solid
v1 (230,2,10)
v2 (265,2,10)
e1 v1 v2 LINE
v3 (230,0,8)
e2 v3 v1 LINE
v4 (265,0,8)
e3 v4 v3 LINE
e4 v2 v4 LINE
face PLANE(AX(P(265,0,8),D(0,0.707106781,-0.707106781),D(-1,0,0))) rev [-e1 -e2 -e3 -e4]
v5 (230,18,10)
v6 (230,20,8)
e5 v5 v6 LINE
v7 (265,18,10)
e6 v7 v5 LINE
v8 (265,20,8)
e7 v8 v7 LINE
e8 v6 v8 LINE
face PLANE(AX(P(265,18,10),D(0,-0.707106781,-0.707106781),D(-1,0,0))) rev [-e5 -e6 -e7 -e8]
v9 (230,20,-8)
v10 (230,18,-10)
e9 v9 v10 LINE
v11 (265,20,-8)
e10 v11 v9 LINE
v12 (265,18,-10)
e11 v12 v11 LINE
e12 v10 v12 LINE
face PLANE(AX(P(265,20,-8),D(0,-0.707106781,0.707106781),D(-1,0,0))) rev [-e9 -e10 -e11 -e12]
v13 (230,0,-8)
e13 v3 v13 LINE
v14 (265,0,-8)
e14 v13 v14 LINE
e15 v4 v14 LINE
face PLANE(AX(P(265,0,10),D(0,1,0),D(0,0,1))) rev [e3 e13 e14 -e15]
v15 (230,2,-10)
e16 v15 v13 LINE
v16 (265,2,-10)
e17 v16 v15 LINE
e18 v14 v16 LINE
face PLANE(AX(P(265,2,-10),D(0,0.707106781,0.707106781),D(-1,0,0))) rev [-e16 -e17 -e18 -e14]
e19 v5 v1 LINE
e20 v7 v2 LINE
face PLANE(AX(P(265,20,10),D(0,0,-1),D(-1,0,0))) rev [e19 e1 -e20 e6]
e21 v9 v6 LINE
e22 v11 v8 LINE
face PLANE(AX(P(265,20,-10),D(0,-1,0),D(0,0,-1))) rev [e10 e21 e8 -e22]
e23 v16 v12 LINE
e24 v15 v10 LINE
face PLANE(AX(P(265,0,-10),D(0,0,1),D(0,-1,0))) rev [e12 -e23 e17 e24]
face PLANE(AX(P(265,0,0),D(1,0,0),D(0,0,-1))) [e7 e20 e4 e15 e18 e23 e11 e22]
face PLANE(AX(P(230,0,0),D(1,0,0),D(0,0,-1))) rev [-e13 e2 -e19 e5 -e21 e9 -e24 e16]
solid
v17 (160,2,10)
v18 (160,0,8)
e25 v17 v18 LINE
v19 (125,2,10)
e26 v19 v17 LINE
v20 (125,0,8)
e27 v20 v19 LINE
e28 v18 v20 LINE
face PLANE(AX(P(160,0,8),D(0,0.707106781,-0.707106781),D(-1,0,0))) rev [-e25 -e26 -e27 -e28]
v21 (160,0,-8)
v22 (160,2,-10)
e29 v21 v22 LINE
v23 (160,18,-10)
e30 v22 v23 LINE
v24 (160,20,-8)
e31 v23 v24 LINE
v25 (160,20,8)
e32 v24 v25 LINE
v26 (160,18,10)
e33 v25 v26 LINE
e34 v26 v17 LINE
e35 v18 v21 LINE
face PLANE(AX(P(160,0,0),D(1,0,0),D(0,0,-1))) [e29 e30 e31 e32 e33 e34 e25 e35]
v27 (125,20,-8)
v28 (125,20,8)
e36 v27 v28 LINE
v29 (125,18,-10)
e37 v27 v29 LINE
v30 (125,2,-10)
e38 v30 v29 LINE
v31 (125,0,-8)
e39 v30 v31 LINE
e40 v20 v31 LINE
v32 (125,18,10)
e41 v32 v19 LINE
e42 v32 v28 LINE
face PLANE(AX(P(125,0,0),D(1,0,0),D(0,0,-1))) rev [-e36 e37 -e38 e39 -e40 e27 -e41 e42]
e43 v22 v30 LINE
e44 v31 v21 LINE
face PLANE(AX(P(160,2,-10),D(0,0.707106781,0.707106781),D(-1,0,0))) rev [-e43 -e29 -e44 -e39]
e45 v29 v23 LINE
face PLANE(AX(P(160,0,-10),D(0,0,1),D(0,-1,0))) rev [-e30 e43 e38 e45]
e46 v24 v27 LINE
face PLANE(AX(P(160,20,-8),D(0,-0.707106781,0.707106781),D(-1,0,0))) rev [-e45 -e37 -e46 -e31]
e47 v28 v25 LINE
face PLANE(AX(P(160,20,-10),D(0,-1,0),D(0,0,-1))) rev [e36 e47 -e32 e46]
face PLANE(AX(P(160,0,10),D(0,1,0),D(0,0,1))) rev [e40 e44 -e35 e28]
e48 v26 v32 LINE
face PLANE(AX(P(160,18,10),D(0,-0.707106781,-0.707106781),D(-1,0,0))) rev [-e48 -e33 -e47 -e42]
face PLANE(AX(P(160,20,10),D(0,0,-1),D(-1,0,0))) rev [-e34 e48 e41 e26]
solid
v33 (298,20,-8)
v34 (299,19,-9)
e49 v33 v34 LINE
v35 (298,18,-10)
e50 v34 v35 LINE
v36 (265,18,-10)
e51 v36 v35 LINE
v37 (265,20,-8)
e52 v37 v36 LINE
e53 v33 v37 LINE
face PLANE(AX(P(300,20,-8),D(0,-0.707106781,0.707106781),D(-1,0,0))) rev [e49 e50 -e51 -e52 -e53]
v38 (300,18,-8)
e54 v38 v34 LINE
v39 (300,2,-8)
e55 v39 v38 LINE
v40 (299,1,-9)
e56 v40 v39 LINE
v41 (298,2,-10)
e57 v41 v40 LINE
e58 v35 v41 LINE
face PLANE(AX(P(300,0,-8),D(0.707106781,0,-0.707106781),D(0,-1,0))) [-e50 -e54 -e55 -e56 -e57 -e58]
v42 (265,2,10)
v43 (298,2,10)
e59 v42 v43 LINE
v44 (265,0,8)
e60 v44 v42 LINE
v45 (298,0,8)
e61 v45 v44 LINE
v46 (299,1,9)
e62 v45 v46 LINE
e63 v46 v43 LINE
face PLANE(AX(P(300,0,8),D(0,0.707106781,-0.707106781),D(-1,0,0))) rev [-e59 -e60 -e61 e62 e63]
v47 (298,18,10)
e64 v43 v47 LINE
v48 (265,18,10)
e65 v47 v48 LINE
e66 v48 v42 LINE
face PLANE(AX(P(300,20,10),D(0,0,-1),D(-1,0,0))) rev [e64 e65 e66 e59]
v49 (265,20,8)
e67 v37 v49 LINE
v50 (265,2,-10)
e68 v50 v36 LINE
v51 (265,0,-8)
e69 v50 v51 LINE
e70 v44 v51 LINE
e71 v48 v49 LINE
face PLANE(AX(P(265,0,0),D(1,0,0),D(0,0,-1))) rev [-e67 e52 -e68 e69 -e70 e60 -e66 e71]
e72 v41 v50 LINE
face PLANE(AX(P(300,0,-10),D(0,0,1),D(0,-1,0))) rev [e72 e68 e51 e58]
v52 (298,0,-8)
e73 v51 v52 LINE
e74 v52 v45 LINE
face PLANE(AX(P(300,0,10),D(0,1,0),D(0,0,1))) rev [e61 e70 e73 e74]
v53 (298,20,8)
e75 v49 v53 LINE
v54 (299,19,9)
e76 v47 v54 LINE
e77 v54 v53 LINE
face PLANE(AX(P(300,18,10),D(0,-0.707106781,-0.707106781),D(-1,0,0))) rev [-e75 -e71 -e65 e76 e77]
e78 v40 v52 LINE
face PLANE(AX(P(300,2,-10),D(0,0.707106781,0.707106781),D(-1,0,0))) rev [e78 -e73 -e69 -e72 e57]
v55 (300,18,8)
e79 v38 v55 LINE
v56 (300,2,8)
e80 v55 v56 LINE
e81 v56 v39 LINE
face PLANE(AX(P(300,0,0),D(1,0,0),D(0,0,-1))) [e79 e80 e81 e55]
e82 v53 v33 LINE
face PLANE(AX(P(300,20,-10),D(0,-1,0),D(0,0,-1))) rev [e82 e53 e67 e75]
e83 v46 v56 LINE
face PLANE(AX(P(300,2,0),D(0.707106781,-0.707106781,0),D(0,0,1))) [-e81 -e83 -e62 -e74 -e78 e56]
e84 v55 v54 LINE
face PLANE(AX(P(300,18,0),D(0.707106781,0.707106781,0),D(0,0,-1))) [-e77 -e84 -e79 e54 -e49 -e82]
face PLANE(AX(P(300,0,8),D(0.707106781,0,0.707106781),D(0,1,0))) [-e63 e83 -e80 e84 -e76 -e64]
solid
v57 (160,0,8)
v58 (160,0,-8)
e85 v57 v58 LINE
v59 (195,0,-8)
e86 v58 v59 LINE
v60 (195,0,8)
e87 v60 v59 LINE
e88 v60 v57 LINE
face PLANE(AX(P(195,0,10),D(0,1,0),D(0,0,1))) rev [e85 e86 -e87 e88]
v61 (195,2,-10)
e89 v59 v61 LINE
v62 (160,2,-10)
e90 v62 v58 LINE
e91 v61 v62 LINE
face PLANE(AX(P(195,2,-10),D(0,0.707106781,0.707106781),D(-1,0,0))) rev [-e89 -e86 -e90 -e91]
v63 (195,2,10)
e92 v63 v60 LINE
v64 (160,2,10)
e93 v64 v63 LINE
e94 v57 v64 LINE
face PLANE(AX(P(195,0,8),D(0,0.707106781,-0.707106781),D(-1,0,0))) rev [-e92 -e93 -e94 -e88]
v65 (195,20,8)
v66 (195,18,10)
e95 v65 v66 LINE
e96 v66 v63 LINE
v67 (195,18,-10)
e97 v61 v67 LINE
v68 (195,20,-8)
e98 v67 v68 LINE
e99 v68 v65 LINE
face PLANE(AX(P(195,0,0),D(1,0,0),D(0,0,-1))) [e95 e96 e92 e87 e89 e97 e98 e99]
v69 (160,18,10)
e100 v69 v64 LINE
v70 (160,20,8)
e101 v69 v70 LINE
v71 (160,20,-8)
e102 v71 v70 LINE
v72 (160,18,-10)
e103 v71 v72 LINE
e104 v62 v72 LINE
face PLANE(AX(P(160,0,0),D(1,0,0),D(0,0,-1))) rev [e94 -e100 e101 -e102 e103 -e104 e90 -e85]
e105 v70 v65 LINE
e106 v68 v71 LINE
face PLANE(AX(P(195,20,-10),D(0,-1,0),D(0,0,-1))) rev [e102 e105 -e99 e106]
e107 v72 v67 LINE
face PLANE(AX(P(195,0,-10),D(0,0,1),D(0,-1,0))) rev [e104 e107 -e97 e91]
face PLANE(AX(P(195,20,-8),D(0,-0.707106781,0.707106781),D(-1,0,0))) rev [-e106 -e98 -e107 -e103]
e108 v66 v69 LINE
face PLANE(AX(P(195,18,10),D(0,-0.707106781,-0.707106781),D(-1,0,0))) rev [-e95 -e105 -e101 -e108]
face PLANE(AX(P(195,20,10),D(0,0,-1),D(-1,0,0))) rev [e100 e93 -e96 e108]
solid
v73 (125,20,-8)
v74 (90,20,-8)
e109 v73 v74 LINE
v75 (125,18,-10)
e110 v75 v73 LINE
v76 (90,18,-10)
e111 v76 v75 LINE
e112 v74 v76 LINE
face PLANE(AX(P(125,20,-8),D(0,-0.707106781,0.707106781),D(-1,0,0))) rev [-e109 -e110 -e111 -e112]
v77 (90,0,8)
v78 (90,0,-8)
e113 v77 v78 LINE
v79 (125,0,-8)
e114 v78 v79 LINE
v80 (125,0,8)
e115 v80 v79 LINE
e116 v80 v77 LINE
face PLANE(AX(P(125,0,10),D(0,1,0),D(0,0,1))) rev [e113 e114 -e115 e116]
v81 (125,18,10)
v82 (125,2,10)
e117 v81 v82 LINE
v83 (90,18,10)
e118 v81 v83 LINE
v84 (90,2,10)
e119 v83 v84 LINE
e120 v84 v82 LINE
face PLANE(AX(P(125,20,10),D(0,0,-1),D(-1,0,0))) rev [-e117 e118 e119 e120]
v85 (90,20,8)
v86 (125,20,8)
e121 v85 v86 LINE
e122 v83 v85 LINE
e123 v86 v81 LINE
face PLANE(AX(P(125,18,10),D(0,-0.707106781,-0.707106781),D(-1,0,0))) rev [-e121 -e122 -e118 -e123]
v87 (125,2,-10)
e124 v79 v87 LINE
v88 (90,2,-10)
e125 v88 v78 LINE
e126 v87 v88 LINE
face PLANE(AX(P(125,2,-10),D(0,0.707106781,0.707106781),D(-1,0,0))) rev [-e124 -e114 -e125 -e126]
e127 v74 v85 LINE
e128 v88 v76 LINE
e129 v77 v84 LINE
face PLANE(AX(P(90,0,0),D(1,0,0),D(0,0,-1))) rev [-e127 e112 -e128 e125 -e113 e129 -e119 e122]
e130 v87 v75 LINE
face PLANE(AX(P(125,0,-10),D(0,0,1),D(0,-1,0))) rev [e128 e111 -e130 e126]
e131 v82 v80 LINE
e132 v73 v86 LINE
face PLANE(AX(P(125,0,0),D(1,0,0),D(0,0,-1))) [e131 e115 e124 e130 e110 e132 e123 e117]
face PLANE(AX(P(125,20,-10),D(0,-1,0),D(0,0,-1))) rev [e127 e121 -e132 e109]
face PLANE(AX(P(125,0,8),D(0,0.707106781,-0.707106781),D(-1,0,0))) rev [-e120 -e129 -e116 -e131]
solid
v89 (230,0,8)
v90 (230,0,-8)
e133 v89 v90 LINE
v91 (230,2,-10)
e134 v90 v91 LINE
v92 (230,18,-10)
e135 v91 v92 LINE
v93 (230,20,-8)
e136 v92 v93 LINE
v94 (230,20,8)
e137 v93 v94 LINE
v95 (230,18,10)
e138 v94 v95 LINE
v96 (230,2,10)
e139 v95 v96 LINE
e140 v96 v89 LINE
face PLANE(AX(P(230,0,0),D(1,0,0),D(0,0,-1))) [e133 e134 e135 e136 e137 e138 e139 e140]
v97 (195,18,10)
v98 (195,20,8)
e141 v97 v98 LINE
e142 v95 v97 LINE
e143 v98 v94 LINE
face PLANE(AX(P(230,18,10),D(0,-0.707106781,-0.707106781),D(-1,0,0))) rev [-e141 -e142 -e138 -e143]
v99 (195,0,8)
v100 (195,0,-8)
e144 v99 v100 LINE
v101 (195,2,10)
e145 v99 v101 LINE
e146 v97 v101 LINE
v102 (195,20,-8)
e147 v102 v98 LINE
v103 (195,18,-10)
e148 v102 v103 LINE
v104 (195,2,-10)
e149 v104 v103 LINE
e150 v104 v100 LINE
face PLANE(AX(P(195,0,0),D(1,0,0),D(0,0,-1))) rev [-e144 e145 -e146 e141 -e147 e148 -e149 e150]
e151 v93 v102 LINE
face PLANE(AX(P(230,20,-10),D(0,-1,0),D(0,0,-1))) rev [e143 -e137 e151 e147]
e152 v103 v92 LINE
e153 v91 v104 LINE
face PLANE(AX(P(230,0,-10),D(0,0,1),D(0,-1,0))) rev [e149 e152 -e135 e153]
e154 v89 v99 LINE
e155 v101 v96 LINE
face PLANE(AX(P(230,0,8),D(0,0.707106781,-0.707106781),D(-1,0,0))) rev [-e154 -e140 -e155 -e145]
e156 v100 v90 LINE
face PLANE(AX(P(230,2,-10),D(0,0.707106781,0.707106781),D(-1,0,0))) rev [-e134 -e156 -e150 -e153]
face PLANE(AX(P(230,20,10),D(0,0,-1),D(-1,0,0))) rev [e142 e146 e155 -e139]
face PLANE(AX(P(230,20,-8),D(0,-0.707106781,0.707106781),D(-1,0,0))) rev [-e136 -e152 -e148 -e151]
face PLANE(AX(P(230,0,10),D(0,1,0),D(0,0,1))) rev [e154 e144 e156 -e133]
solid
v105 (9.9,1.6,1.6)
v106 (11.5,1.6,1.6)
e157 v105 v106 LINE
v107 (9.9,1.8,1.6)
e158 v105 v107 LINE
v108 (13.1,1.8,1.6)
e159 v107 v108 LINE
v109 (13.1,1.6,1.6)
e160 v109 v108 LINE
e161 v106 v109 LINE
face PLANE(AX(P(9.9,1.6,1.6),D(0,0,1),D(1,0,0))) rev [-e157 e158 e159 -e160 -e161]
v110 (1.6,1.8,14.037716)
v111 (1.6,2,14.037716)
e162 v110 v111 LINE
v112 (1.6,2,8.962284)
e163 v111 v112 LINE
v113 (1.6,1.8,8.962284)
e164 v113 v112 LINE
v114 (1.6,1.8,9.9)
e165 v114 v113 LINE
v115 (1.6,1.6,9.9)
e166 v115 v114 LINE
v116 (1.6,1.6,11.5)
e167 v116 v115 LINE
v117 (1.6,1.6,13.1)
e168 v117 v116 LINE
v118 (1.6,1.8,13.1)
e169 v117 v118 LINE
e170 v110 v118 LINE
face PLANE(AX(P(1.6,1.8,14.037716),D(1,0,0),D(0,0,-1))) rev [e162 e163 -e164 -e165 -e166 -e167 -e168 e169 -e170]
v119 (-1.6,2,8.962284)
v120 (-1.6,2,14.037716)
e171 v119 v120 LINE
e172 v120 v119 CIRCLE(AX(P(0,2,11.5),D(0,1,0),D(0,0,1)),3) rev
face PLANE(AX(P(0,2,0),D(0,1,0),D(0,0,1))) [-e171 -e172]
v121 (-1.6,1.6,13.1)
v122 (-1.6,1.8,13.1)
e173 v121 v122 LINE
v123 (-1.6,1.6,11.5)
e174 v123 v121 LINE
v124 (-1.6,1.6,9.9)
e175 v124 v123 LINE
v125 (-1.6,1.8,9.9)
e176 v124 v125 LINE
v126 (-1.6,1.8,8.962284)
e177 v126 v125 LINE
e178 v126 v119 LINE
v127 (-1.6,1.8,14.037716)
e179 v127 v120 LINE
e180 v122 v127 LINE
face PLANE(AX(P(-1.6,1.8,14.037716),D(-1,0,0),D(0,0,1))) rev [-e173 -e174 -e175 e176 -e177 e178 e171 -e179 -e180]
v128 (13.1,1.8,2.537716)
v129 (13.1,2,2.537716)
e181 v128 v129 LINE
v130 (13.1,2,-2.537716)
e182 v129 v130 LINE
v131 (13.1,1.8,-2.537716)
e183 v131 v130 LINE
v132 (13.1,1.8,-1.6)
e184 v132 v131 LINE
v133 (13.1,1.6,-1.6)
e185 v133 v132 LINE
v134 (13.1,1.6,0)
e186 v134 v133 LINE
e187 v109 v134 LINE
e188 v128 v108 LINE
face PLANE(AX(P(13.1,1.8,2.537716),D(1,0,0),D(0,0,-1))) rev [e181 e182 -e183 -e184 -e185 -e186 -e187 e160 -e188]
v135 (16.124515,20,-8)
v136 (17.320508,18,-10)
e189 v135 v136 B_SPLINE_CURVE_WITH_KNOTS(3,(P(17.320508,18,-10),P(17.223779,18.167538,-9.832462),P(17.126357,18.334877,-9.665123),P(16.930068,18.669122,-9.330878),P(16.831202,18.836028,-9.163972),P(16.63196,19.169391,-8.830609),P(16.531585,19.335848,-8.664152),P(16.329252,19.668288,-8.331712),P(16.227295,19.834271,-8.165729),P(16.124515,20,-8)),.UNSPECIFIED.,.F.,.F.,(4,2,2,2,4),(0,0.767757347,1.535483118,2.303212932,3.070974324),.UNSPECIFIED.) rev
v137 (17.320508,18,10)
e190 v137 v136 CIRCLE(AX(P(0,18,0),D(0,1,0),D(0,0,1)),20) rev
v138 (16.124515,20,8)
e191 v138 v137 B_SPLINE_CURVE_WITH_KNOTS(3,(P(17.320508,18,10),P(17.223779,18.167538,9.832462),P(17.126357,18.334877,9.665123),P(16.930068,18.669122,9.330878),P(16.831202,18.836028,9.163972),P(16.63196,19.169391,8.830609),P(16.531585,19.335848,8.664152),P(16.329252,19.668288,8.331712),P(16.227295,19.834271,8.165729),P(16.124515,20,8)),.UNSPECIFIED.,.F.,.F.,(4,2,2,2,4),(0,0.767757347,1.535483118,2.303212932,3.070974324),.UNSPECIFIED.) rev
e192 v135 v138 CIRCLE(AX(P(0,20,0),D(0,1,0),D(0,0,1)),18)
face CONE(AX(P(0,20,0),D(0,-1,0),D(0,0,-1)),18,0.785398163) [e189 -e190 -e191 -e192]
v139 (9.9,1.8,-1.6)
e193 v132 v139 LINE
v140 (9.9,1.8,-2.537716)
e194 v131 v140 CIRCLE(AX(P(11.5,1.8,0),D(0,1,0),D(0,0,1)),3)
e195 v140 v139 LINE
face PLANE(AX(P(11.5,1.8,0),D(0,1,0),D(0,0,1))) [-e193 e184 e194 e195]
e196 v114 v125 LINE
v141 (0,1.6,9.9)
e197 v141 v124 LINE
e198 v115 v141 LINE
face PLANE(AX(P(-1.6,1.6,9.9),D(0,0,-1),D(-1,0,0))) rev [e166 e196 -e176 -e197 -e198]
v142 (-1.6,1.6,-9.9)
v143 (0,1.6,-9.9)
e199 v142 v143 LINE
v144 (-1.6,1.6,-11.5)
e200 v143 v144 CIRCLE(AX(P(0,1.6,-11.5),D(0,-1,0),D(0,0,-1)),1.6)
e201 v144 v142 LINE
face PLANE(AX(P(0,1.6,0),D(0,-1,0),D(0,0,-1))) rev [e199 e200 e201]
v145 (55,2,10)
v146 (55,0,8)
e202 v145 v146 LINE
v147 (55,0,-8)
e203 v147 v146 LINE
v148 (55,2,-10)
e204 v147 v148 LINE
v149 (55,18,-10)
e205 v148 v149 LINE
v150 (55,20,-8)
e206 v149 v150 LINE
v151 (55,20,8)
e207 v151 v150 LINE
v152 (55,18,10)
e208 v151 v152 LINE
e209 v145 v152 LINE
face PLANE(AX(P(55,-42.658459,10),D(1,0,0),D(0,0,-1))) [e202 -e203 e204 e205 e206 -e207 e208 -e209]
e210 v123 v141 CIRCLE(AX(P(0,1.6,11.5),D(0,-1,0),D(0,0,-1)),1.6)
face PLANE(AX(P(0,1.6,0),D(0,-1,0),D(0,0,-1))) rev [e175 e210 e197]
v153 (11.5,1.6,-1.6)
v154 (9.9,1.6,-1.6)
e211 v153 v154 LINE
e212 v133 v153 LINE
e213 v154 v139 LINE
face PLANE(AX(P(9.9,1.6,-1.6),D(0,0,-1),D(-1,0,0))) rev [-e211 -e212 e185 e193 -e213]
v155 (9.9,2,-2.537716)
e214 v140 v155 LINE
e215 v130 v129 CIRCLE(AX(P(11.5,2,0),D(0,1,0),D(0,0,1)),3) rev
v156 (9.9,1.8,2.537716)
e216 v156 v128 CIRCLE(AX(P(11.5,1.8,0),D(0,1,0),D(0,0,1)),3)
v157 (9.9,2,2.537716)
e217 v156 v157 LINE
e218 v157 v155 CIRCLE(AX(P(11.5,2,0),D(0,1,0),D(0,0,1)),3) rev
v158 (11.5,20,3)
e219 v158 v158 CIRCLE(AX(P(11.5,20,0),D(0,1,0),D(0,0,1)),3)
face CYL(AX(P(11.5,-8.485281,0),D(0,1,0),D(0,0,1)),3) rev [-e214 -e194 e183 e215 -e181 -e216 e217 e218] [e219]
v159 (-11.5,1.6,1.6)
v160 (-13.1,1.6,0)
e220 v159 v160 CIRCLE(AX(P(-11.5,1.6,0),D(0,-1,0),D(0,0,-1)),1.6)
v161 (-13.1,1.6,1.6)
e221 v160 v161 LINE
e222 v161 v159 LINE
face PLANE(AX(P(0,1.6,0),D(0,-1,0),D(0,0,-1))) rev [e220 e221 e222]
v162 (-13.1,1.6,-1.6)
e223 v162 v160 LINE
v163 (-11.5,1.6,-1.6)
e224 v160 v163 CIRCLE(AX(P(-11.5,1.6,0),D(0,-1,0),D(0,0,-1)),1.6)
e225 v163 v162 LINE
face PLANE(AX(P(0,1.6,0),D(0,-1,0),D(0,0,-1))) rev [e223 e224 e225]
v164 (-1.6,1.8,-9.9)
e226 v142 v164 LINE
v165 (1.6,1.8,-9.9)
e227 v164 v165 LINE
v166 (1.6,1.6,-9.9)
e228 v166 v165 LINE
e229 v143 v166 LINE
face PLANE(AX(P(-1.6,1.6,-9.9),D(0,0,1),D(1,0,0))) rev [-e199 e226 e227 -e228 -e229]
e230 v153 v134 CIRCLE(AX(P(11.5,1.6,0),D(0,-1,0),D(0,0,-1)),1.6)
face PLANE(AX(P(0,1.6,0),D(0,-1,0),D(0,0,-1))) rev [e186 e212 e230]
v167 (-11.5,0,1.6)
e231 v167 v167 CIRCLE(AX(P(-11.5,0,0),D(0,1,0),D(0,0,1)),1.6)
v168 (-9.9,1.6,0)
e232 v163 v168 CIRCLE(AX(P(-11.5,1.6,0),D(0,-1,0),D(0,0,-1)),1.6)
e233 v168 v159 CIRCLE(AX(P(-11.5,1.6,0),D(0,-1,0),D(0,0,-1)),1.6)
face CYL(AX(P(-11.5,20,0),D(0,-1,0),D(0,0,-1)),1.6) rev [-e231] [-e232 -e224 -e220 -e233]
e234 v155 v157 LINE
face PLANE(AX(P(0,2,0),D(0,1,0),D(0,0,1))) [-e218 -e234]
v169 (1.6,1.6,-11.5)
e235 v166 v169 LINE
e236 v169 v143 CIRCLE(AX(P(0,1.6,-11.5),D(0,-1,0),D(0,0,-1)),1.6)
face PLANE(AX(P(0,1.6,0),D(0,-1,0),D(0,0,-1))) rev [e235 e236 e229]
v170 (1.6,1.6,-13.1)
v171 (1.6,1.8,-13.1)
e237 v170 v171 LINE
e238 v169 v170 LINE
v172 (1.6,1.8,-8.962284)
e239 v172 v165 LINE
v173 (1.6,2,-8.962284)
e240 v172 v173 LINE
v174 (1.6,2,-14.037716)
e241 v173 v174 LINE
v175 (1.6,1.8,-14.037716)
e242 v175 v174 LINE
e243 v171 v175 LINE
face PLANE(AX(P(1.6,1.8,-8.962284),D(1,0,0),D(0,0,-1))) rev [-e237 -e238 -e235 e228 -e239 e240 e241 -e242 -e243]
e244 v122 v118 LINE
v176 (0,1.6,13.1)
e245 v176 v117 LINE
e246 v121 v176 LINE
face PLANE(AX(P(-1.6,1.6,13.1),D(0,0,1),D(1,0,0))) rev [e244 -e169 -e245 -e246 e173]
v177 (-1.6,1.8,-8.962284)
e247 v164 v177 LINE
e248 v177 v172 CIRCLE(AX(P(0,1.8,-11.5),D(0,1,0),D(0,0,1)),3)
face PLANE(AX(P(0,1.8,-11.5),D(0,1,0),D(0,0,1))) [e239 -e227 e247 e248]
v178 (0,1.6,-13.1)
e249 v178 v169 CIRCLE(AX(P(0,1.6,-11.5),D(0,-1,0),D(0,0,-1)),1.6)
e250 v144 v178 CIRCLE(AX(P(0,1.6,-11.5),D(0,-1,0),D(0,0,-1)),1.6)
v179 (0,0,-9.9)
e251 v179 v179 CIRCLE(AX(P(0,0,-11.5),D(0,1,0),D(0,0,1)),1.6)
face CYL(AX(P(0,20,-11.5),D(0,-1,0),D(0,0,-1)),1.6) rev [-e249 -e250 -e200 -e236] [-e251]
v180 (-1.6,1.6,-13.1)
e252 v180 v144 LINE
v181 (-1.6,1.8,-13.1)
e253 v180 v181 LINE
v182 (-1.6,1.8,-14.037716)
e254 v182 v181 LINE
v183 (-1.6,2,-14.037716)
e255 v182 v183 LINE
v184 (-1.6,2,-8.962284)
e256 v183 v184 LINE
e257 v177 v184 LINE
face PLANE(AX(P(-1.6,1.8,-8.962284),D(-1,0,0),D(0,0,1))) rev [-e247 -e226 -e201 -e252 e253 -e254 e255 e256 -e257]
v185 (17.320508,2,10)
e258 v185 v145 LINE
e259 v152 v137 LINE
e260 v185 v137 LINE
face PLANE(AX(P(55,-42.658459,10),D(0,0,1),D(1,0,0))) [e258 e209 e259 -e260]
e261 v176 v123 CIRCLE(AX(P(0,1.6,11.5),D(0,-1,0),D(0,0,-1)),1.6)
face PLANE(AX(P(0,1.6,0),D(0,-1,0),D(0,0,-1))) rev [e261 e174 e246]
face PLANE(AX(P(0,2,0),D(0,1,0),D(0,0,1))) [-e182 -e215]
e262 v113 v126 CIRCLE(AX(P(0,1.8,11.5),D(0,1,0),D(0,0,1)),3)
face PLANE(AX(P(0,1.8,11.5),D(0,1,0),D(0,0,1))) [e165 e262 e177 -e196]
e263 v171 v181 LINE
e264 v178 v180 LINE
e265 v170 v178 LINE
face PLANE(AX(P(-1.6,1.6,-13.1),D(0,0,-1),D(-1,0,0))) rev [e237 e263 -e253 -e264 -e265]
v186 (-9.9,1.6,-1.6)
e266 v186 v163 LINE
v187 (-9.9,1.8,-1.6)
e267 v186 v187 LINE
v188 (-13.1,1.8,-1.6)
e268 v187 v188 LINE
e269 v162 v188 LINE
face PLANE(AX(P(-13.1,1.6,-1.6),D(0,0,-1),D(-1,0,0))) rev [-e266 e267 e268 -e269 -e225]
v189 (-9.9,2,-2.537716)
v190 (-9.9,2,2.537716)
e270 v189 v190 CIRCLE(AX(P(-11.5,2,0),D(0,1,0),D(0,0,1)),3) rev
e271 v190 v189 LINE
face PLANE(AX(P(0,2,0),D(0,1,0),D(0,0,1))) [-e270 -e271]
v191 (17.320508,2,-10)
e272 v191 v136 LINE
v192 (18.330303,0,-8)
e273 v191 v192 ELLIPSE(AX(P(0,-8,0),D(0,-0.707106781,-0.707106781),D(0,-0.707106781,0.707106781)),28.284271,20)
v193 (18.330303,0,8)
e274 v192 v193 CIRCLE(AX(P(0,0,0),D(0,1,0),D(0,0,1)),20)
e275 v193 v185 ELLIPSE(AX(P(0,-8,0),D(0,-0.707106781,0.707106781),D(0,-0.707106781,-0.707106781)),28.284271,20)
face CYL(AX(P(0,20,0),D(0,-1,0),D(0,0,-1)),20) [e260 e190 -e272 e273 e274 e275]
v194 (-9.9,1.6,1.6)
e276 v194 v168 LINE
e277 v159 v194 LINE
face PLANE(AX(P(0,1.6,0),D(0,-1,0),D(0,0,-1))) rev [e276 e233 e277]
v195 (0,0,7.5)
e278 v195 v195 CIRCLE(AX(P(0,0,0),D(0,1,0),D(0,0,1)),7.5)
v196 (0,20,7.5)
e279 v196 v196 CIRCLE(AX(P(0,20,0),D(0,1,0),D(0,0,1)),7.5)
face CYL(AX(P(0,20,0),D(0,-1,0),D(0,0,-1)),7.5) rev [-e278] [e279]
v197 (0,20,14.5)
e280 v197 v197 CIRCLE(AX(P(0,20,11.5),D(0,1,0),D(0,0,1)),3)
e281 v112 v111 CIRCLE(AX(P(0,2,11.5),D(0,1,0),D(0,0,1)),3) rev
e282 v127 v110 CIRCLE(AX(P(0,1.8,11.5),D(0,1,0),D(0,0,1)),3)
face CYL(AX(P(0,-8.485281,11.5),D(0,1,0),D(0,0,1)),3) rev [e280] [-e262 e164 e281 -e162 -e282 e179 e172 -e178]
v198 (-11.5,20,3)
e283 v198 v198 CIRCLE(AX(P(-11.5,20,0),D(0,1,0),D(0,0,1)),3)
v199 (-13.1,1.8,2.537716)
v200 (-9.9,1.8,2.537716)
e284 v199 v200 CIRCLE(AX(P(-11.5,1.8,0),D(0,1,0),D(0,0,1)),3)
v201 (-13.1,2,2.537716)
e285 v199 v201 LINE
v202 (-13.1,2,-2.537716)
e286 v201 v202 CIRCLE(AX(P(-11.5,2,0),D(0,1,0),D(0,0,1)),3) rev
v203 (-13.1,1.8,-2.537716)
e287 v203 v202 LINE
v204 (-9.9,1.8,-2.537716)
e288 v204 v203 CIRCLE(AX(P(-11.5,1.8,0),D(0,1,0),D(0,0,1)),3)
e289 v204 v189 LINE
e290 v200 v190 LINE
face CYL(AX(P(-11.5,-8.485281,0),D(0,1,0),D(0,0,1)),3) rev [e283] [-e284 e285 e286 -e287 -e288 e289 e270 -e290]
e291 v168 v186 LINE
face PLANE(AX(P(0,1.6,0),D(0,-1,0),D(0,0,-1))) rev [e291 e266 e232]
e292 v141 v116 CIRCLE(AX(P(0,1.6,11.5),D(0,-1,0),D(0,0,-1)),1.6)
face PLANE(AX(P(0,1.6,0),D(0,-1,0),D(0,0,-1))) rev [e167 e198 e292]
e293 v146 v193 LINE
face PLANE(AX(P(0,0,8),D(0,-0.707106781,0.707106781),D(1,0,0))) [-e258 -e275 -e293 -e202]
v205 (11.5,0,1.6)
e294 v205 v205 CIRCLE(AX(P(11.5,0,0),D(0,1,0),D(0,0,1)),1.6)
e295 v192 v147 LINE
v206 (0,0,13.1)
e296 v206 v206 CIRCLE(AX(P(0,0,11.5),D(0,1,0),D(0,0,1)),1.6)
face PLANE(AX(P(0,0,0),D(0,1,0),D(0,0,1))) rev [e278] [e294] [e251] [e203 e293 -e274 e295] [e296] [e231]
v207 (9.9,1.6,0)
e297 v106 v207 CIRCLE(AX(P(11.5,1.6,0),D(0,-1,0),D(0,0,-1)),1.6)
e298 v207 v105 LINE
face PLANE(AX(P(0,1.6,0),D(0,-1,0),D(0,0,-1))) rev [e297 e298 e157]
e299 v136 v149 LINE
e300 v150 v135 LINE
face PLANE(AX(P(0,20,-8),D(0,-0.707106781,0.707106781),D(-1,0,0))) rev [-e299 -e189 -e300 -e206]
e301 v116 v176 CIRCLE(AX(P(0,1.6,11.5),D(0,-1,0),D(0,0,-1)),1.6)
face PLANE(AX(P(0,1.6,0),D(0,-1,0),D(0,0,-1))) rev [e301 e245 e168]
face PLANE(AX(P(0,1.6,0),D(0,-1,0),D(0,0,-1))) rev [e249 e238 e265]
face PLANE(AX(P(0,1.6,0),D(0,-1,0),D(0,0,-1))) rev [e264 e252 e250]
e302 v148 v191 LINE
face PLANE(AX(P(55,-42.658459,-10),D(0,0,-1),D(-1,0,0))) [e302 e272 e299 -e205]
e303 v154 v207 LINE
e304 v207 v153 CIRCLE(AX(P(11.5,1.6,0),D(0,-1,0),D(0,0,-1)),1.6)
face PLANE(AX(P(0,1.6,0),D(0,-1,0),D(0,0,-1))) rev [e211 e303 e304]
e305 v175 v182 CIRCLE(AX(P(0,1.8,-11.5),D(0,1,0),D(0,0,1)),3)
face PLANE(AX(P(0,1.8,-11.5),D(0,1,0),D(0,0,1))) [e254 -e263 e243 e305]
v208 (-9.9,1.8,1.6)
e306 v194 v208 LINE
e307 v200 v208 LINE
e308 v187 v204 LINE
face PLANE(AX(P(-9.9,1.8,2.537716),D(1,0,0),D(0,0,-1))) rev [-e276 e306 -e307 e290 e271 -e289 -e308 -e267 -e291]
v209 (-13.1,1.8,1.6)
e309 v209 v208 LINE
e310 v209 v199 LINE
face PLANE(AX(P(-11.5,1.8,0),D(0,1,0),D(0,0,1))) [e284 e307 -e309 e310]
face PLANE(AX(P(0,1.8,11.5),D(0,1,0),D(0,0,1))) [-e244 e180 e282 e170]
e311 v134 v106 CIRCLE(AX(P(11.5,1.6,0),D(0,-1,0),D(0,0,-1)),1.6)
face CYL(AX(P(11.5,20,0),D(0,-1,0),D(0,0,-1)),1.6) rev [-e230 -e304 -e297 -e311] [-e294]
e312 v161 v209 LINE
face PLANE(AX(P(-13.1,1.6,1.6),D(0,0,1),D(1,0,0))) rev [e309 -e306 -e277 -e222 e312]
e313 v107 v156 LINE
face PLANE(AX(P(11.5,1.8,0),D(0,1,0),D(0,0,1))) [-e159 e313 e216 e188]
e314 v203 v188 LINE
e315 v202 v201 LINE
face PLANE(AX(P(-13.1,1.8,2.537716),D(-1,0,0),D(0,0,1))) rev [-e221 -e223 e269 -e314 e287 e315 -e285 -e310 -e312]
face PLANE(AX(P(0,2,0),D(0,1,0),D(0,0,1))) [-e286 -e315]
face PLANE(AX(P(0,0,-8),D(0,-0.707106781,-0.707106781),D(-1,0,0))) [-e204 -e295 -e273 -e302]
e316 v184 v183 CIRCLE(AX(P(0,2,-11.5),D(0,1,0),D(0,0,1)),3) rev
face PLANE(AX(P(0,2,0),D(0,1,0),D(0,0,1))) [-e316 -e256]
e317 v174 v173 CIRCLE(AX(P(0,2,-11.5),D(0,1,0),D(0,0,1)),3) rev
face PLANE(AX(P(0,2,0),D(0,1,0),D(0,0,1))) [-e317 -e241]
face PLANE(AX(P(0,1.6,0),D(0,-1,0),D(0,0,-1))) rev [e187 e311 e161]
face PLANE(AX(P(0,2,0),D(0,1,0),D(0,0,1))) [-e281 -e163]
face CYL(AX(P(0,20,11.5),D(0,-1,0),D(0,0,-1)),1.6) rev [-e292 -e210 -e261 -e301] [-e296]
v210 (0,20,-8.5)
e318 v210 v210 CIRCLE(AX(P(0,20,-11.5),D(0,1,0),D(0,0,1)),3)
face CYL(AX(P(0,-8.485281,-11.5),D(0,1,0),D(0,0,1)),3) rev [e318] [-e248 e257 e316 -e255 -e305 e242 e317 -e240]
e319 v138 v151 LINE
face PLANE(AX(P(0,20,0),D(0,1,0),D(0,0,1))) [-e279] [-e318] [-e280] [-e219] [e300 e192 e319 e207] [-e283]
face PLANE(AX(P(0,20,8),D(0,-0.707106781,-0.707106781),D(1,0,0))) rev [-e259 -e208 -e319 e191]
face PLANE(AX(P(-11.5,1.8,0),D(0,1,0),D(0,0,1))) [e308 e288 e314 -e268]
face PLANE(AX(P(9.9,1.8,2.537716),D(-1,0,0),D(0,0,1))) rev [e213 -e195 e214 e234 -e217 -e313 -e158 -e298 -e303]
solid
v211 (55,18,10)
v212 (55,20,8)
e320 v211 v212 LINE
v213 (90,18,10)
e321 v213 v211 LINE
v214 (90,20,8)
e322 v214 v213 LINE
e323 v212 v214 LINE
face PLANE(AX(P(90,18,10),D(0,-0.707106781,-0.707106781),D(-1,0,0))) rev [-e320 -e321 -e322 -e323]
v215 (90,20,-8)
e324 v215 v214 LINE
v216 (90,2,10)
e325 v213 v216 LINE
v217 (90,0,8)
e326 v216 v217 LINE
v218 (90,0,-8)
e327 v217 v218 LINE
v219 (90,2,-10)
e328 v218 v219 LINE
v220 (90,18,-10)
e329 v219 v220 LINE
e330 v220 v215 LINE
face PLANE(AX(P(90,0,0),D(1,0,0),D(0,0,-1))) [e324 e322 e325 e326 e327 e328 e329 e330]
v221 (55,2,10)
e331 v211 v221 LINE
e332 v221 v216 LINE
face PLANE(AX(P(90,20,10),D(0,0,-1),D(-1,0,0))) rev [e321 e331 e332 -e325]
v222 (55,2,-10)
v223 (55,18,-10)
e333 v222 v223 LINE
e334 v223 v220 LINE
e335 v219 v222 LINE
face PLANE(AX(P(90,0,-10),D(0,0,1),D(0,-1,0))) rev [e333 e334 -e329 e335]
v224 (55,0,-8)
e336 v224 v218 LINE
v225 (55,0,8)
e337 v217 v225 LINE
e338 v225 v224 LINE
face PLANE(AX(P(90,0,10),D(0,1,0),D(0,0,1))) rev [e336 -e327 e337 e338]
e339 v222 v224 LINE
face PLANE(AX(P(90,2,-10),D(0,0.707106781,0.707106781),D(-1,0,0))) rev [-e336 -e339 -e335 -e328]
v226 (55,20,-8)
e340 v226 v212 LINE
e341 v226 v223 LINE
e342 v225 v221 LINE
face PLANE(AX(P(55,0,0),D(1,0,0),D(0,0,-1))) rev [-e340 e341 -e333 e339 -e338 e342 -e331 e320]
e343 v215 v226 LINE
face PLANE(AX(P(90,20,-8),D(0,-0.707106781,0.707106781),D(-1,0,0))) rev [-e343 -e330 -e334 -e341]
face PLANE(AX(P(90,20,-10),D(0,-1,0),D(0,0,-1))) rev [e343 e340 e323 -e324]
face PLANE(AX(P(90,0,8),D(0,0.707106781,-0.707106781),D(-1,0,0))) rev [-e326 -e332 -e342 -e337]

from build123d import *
from build123d.topology import SkipClean

# Parameters (mm, degrees)
SKETCH1_R           = 20
SKETCH1_R_2         = 7.5
SKETCH1_R_3         = 1.6
BOSS_EXTRUDE1_DEPTH = 20
SKETCH2_R           = 3
CUT_EXTRUDE2_DEPTH  = 18
BOSS_EXTRUDE2_START = -20
BOSS_EXTRUDE2_DEPTH = 20
SKETCH4_W           = 20
SKETCH4_H           = 20
BOSS_EXTRUDE3_DEPTH = 35
LPATTERN1_COUNT     = 7
LPATTERN1_PITCH     = 35
CHAMFER2_SIZE       = 2
CHAMFER3_SIZE       = 2
CHAMFER4_SIZE       = 2
CHAMFER5_SIZE       = 2
CHAMFER6_SIZE       = 2
CHAMFER7_SIZE       = 2
CHAMFER8_SIZE       = 2
CHAMFER9_SIZE       = 2
CHAMFER10_SIZE      = 2
CUT_EXTRUDE3_DEPTH  = 0.2
SKETCH6_W           = 3.2
SKETCH6_H           = 3.2
CUT_EXTRUDE4_DEPTH  = 0.2


with BuildPart() as part:
    # Sketch1 → Boss-Extrude1 (new body)
    with BuildSketch(Plane(origin=(0, 0, 0), x_dir=(1, 0, 0), z_dir=(0, 1, 0))):
        with Locations(Location((0, 0, 0), (0, 0, 270))):
            Circle(SKETCH1_R)
        with Locations(Location((0, 0, 0), (0, 0, 270))):
            Circle(SKETCH1_R_2, mode=Mode.SUBTRACT)
        with Locations(Location((0, 11.5, 0), (0, 0, 270))):
            Circle(SKETCH1_R_3, mode=Mode.SUBTRACT)
        with Locations(Location((11.5, 0, 0), (0, 0, 270))):
            Circle(SKETCH1_R_3, mode=Mode.SUBTRACT)
        with Locations(Location((0, -11.5, 0), (0, 0, 270))):
            Circle(SKETCH1_R_3, mode=Mode.SUBTRACT)
        with Locations(Location((-11.5, 0, 0), (0, 0, 270))):
            Circle(SKETCH1_R_3, mode=Mode.SUBTRACT)
    extrude(amount=BOSS_EXTRUDE1_DEPTH)

    # Sketch2 → Cut-Extrude2 (cut)
    with BuildSketch(Plane(origin=(0, 20, 0), x_dir=(1, 0, 0), z_dir=(0, 1, 0))):
        with Locations(Location((0, 11.5, 0), (0, 0, 270))):
            Circle(SKETCH2_R)
        with Locations(Location((11.5, 0, 0), (0, 0, 270))):
            Circle(SKETCH2_R)
        with Locations(Location((0, -11.5, 0), (0, 0, 270))):
            Circle(SKETCH2_R)
        with Locations(Location((-11.5, 0, 0), (0, 0, 270))):
            Circle(SKETCH2_R)
    extrude(amount=-CUT_EXTRUDE2_DEPTH, mode=Mode.SUBTRACT)

    # Sketch3 → Boss-Extrude2 (add)
    with BuildSketch(Plane(origin=(0, 20, 0), x_dir=(1, 0, 0), z_dir=(0, 1, 0)).offset(BOSS_EXTRUDE2_START)):
        with BuildLine():
            Line((55, -10), (55, 10))
            Line((55, 10), (17.320508076, 10))
            ThreePointArc((17.320508076, 10), (20, 0), (17.320508076, -10))
            Line((17.320508076, -10), (55, -10))
        make_face()
    extrude(amount=BOSS_EXTRUDE2_DEPTH)

    # Chamfer9
    chamfer9_edges = [part.edges().sort_by_distance(p)[0] for p in [
        (-20, 20, 0),
        (36.160254038, 20, -10),
        (36.160254038, 20, 10),
        (36.160254038, 0, -10),
        (36.160254038, 0, 10),
    ]]
    chamfer(chamfer9_edges, length=CHAMFER9_SIZE)

    # Sketch5 → Cut-Extrude3 (cut)
    with SkipClean():  # the faces are left unmerged after this step: merging them gives an invalid solid
        with BuildSketch(Plane(origin=(0, 2, 0), x_dir=(1, 0, 0), z_dir=(0, 1, 0))):
            with BuildLine():
                Line((-1.6, 8.962284492), (-1.6, 14.037715508))
                ThreePointArc((-1.6, 14.037715508), (0, 14.5), (1.6, 14.037715508))
                Line((1.6, 14.037715508), (1.6, 8.962284492))
                ThreePointArc((1.6, 8.962284492), (0, 8.5), (-1.6, 8.962284492))
            make_face()
            with BuildLine():
                Line((9.9, -2.537715508), (9.9, 2.537715508))
                ThreePointArc((9.9, 2.537715508), (11.5, 3), (13.1, 2.537715508))
                Line((13.1, 2.537715508), (13.1, -2.537715508))
                ThreePointArc((13.1, -2.537715508), (11.5, -3), (9.9, -2.537715508))
            make_face()
            with BuildLine():
                Line((-1.6, -14.037715508), (-1.6, -8.962284492))
                ThreePointArc((-1.6, -8.962284492), (0, -8.5), (1.6, -8.962284492))
                Line((1.6, -8.962284492), (1.6, -14.037715508))
                ThreePointArc((1.6, -14.037715508), (0, -14.5), (-1.6, -14.037715508))
            make_face()
            with BuildLine():
                Line((-13.1, -2.537715508), (-13.1, 2.537715508))
                ThreePointArc((-13.1, 2.537715508), (-11.5, 3), (-9.9, 2.537715508))
                Line((-9.9, 2.537715508), (-9.9, -2.537715508))
                ThreePointArc((-9.9, -2.537715508), (-11.5, -3), (-13.1, -2.537715508))
            make_face()
        extrude(amount=-CUT_EXTRUDE3_DEPTH, mode=Mode.SUBTRACT)

    # Sketch6 → Cut-Extrude4 (cut)
    with SkipClean():  # the faces are left unmerged after this step: merging them gives an invalid solid
        with BuildSketch(Plane(origin=(0, 1.8, 0), x_dir=(1, 0, 0), z_dir=(0, 1, 0))):
            with Locations((0, 11.5)):
                Rectangle(SKETCH6_W, SKETCH6_H)
            with Locations((11.5, 0)):
                Rectangle(SKETCH6_W, SKETCH6_H)
            with Locations((0, -11.5)):
                Rectangle(SKETCH6_W, SKETCH6_H)
            with Locations((-11.5, 0)):
                Rectangle(SKETCH6_W, SKETCH6_H)
        extrude(amount=-CUT_EXTRUDE4_DEPTH, mode=Mode.SUBTRACT)


with BuildPart() as body_2:
    # Sketch4 → Boss-Extrude3 (new body)
    with BuildSketch(Plane(origin=(55, 0, 0), x_dir=(0, 0, -1), z_dir=(1, 0, 0))):
        with Locations((0, 10)):
            Rectangle(SKETCH4_W, SKETCH4_H)
    boss_extrude3 = extrude(amount=BOSS_EXTRUDE3_DEPTH)

    # Chamfer2
    chamfer2_edges = [body_2.edges().sort_by_distance(p)[0] for p in [
        (72.5, 20, 10),
        (72.5, 20, -10),
        (72.5, 0, -10),
        (72.5, 0, 10),
    ]]
    chamfer(chamfer2_edges, length=CHAMFER2_SIZE)


with BuildPart() as lpattern1_1:
    # LPattern1: pattern copy
    add(boss_extrude3.moved(Location(Vector(1, 0, 0) * (1 * LPATTERN1_PITCH))))

    # Chamfer3
    chamfer3_edges = [lpattern1_1.edges().sort_by_distance(p)[0] for p in [
        (107.5, 20, 10),
        (107.5, 20, -10),
        (107.5, 0, -10),
        (107.5, 0, 10),
    ]]
    chamfer(chamfer3_edges, length=CHAMFER3_SIZE)


with BuildPart() as lpattern1_2:
    # LPattern1: pattern copy
    add(boss_extrude3.moved(Location(Vector(1, 0, 0) * (2 * LPATTERN1_PITCH))))

    # Chamfer4
    chamfer4_edges = [lpattern1_2.edges().sort_by_distance(p)[0] for p in [
        (142.5, 20, 10),
        (142.5, 20, -10),
        (142.5, 0, -10),
        (142.5, 0, 10),
    ]]
    chamfer(chamfer4_edges, length=CHAMFER4_SIZE)


with BuildPart() as lpattern1_3:
    # LPattern1: pattern copy
    add(boss_extrude3.moved(Location(Vector(1, 0, 0) * (3 * LPATTERN1_PITCH))))

    # Chamfer5
    chamfer5_edges = [lpattern1_3.edges().sort_by_distance(p)[0] for p in [
        (177.5, 20, 10),
        (177.5, 20, -10),
        (177.5, 0, -10),
        (177.5, 0, 10),
    ]]
    chamfer(chamfer5_edges, length=CHAMFER5_SIZE)


with BuildPart() as lpattern1_4:
    # LPattern1: pattern copy
    add(boss_extrude3.moved(Location(Vector(1, 0, 0) * (4 * LPATTERN1_PITCH))))

    # Chamfer6
    chamfer6_edges = [lpattern1_4.edges().sort_by_distance(p)[0] for p in [
        (212.5, 20, 10),
        (212.5, 20, -10),
        (212.5, 0, -10),
        (212.5, 0, 10),
    ]]
    chamfer(chamfer6_edges, length=CHAMFER6_SIZE)


with BuildPart() as lpattern1_5:
    # LPattern1: pattern copy
    add(boss_extrude3.moved(Location(Vector(1, 0, 0) * (5 * LPATTERN1_PITCH))))

    # Chamfer7
    chamfer7_edges = [lpattern1_5.edges().sort_by_distance(p)[0] for p in [
        (247.5, 20, 10),
        (247.5, 20, -10),
        (247.5, 0, -10),
        (247.5, 0, 10),
    ]]
    chamfer(chamfer7_edges, length=CHAMFER7_SIZE)


with BuildPart() as lpattern1_6:
    # LPattern1: pattern copy
    add(boss_extrude3.moved(Location(Vector(1, 0, 0) * (6 * LPATTERN1_PITCH))))

    # Chamfer8
    chamfer8_edges = [lpattern1_6.edges().sort_by_distance(p)[0] for p in [
        (282.5, 20, 10),
        (282.5, 20, -10),
        (282.5, 0, -10),
        (282.5, 0, 10),
    ]]
    chamfer(chamfer8_edges, length=CHAMFER8_SIZE)

    # Chamfer10
    # the kernel refuses this chamfer: 2 mm, written as the material it takes off along each edge
    with BuildSketch(Plane(origin=(300, 23.143365976, 10), x_dir=(0.02749587661058217, 0, -0.9996219169112968), z_dir=(0, -1, 0)), Plane(origin=(300, -3.143365976, -10), x_dir=(0.02749587661058217, 0, 0.9996219169112968), z_dir=(0, 1, 0)), Plane(origin=(300, 20, -13.143365976), x_dir=(0.0274958766105822, -0.999621916911297, 0), z_dir=(0, 0, 1))) as chamfer10_piece_1:
        Polygon((CHAMFER10_SIZE * 0.999621916911, -CHAMFER10_SIZE * 0.0274958766106), (-CHAMFER10_SIZE * 0.0274958766106, -CHAMFER10_SIZE * 0.999621916911), (0, 0), align=None)
    extrude(amount=26.286731952, mode=Mode.SUBTRACT)
    with BuildSketch(Plane(origin=(300, 0, 13.143365976), x_dir=(-0.9996219169112968, -0.027495876610586483, 0), z_dir=(0, 0, -1))) as chamfer10_piece_2:
        Polygon((CHAMFER10_SIZE * 0.999621916911, CHAMFER10_SIZE * 0.0274958766106), (-CHAMFER10_SIZE * 0.0274958766106, CHAMFER10_SIZE * 0.999621916911), (0, 0), align=None)
    extrude(amount=26.286731952, mode=Mode.SUBTRACT)


solid = Compound([part.part, body_2.part, lpattern1_1.part, lpattern1_2.part, lpattern1_3.part, lpattern1_4.part, lpattern1_5.part, lpattern1_6.part])
